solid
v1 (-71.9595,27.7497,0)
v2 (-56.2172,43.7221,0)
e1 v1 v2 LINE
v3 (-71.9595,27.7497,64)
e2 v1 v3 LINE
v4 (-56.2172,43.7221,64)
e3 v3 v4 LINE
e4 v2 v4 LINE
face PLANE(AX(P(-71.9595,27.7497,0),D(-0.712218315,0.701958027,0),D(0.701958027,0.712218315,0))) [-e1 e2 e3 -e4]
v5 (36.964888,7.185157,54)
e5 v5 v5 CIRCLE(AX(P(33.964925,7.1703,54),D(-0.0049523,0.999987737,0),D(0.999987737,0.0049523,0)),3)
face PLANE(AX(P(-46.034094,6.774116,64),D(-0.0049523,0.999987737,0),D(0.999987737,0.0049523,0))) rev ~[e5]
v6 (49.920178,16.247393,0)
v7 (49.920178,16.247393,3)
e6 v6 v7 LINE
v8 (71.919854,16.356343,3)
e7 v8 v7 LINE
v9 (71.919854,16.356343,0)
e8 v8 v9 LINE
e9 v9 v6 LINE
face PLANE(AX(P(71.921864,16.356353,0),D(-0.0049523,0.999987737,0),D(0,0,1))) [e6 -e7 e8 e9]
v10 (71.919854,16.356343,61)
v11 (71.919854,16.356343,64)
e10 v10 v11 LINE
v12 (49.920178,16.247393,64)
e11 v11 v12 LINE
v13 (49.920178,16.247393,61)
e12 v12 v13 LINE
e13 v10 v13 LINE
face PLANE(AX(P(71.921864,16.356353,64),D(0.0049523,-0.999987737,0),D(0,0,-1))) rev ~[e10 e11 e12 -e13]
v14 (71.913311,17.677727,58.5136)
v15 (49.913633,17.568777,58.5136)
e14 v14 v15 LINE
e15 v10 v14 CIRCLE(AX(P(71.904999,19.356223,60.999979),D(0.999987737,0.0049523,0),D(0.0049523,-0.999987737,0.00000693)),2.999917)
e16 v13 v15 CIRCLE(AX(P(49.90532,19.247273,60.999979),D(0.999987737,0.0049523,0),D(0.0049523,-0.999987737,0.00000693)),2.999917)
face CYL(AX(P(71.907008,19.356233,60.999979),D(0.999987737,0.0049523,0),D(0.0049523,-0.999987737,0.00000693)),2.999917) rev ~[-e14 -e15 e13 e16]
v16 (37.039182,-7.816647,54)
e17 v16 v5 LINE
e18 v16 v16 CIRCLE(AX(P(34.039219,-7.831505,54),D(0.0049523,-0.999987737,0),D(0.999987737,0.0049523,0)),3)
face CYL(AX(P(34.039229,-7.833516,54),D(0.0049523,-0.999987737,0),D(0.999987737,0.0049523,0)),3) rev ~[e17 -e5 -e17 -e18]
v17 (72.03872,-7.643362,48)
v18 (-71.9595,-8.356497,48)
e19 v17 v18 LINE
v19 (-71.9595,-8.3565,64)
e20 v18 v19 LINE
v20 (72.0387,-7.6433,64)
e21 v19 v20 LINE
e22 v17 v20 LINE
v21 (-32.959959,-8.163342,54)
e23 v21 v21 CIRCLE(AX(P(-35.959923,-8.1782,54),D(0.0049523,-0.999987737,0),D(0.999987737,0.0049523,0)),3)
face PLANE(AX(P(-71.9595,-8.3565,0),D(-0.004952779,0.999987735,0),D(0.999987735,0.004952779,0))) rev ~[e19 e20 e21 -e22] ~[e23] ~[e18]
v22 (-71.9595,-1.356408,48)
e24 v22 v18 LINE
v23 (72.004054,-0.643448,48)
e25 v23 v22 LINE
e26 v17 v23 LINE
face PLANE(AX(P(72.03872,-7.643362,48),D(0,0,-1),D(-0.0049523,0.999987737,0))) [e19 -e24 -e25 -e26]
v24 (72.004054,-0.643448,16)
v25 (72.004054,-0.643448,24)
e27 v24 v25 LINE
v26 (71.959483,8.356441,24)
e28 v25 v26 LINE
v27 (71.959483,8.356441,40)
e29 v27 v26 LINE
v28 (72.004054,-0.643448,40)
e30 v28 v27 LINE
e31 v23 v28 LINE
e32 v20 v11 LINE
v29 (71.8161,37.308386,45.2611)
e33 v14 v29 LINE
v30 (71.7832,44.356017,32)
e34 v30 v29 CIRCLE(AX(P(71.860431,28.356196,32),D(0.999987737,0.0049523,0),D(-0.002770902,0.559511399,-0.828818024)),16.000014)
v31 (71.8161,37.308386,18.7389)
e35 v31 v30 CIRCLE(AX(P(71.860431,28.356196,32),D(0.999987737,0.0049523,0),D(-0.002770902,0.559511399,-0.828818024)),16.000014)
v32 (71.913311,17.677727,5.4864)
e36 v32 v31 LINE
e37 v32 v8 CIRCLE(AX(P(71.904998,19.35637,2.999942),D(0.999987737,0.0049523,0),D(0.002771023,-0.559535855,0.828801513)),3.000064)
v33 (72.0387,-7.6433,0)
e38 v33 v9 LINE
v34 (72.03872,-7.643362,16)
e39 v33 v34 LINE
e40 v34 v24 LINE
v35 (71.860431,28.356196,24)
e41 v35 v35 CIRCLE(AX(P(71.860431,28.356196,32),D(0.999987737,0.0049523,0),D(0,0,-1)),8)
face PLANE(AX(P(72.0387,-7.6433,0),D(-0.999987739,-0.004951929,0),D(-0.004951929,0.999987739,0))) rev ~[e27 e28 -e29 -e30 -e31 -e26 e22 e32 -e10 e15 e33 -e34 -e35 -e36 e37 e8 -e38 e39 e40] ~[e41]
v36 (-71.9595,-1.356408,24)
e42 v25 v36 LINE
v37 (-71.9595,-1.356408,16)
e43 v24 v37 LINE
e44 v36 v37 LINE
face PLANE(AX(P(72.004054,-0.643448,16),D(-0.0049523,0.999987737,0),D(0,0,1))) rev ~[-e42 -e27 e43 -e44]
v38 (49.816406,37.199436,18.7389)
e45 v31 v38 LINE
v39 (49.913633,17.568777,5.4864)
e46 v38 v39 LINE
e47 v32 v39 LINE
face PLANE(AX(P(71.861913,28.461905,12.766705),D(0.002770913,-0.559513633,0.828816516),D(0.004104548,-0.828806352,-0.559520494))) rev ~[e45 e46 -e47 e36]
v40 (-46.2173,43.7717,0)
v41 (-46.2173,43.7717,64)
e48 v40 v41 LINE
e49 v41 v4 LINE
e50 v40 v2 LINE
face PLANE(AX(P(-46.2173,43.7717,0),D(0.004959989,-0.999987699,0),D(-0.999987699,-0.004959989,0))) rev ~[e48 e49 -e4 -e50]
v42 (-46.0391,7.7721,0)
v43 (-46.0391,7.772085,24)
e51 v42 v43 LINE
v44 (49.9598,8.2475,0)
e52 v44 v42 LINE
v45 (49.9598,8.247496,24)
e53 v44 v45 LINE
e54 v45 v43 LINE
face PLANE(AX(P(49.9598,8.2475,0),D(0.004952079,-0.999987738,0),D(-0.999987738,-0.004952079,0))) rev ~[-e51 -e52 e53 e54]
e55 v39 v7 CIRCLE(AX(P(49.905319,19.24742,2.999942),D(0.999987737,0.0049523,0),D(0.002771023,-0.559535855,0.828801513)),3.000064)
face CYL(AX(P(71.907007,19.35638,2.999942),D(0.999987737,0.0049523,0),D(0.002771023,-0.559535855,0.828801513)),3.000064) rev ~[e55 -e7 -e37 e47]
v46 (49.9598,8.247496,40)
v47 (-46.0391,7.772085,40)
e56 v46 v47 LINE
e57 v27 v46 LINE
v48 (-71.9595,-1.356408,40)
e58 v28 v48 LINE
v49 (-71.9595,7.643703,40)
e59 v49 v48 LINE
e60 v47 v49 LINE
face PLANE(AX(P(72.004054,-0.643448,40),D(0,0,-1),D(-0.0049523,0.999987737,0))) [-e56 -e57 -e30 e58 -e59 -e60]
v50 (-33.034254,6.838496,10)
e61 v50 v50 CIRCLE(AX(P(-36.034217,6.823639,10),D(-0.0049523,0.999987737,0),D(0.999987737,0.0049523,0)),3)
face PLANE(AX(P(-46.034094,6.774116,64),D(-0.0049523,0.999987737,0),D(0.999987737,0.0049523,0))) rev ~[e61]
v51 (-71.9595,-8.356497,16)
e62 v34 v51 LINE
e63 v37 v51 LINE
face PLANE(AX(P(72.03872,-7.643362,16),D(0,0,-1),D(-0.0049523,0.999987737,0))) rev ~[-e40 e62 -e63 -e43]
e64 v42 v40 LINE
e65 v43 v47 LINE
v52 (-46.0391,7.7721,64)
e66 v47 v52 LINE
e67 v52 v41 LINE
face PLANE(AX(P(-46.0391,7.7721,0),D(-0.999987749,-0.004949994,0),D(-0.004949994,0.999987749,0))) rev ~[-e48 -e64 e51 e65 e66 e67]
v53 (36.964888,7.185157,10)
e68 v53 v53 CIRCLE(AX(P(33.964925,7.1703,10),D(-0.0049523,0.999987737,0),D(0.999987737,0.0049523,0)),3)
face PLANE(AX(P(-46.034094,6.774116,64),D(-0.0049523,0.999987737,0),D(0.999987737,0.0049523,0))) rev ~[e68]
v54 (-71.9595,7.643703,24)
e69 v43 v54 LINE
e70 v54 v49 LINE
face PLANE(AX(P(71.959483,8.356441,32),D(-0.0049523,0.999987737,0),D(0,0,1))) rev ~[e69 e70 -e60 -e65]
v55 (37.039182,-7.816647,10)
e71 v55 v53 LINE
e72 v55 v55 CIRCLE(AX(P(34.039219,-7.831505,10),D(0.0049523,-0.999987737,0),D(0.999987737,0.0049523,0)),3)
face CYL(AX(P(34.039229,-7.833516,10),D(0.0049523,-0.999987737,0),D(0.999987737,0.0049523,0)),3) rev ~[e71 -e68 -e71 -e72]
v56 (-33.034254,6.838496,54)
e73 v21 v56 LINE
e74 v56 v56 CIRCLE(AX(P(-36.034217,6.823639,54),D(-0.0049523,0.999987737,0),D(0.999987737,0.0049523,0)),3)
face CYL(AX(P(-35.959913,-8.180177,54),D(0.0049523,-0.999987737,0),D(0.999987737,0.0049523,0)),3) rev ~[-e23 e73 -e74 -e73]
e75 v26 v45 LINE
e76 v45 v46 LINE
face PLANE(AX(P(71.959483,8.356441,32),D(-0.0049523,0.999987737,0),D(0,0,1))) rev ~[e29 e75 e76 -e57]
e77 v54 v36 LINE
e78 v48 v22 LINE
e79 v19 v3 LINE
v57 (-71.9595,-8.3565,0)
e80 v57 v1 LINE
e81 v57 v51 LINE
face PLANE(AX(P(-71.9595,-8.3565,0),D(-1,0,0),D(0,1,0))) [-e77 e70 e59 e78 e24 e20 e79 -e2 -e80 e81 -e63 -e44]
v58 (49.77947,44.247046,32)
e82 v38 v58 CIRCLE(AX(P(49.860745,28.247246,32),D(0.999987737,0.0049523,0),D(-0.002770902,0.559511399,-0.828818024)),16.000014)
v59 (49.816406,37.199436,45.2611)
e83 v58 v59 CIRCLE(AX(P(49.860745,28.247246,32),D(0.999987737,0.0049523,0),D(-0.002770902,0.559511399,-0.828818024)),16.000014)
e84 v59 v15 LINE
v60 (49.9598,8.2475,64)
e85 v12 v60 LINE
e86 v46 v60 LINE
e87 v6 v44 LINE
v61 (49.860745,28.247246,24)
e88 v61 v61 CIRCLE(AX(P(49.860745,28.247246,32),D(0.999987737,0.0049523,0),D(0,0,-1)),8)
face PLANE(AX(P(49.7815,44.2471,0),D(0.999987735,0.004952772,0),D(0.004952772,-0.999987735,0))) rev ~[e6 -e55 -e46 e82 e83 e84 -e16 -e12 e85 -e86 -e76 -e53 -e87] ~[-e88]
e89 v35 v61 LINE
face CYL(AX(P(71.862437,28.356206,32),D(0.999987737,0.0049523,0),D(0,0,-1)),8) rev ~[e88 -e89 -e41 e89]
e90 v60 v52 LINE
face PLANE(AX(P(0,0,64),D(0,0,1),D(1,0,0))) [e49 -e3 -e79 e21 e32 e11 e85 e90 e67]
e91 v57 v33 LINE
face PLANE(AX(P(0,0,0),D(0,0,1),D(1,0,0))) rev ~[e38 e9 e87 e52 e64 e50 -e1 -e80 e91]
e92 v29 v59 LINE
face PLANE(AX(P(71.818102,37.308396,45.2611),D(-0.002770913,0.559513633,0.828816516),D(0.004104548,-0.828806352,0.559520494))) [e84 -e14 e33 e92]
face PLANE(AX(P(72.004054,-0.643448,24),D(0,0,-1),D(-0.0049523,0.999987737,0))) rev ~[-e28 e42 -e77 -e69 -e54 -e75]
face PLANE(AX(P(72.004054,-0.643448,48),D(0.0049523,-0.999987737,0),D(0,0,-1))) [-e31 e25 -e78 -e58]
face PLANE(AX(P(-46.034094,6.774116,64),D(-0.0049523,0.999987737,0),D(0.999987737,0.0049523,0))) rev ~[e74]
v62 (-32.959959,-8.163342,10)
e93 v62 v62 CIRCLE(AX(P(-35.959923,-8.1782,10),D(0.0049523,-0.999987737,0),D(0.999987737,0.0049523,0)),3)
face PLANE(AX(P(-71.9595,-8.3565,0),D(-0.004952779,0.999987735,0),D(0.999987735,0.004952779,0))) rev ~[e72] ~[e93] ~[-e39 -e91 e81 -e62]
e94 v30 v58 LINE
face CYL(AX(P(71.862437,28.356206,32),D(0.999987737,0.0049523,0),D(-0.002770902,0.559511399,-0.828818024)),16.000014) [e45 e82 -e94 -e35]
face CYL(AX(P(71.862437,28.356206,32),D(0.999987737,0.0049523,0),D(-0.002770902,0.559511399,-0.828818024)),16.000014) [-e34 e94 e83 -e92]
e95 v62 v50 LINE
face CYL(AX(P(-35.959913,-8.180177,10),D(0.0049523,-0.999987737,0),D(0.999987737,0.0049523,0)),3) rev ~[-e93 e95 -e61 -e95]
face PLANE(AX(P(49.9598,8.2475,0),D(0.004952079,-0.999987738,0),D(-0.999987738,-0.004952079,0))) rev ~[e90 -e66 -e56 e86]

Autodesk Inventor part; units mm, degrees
ref_plane "YZ Plane" through (0, 0, 0) normal (1, 0, 0) x (0, 1, 0)
ref_plane "XZ Plane" through (0, 0, 0) normal (0, 1, 0) x (-1, 0, 0)
ref_plane "XY Plane" through (0, 0, 0) normal (0, 0, 1) x (1, 0, 0)
sketch "Sketch1" plane through (0, 0, 0) normal (0, 0, 1) x (1, 0, 0)
  line L0 (-71.9595, -8.3565) -> (72.0387, -7.6433)
  line L1 (72.0387, -7.6433) -> (71.7812, 44.356)
  line L2 (71.7812, 44.356) -> (49.7815, 44.2471)
  line L3 (49.7815, 44.2471) -> (49.9598, 8.2475)
  line L4 (49.9598, 8.2475) -> (-46.0391, 7.7721)
  line L5 (-46.0391, 7.7721) -> (-46.2173, 43.7717)
  line L6 (-46.2173, 43.7717) -> (-56.2172, 43.7221)
  line L7 (-71.9595, -8.3565) -> (-71.9595, 27.7497)
  line L8 (-71.9595, 27.7497) -> (-56.2172, 43.7221)
  point P0 (0, 0)
  dimension "d0" = 144
  dimension "d1" = 52
  dimension "d2" = 22
  dimension "d3" = 36
  dimension "d4" = 96
  dimension "d5" = 36
  dimension "d6" = 10
  dimension "d8" = 72
  dimension "d9" = 16
  dimension "d10" = 8
extrude "Extrusion1" add sketch "Sketch1" along normal blind 64
sketch "Sketch3" plane through (71.7812, 44.356, 64) normal (0.9999877, 0.0049523, 0) x (0, 0, -1)
  line L0 (64, -52) -> (64, 0) projected
  line L1 (0, -52) -> (0, 0) projected
  line L2 (48, -52) -> (48, -45)
  line L3 (40, -45) -> (40, -36)
  line L4 (48, -45) -> (40, -45)
  line L5 (40, -36) -> (32, -36)
  line L6 (64, -36) -> (0, -36) projected
  line L7 (16, -52) -> (16, -45)
  line L8 (24, -45) -> (24, -36)
  line L9 (16, -45) -> (24, -45)
  line L10 (24, -36) -> (32, -36)
  line L11 (16, -52) -> (48, -52)
  line L12 (64, -52) -> (0, -52) projected
  line L13 (64, -36) -> (64, 0) projected
  arc A0 (58.5136, -26.6786) -> (61, -28) centre (61, -25) ccw
  arc A1 (45.2611, -7.0477) -> (18.7389, -7.0477) centre (32, -16) ccw
  circle A2 centre (32, -16) radius 8
  line L14 (64, 0) -> (0, 0) projected
  line L15 (45.2611, -7.0477) -> (58.5136, -26.6786)
  line L16 (64, -28) -> (61, -28)
  line L17 (64, -15.8943) -> (0, -15.8943) projected
  arc A3 (3, -28) -> (5.4864, -26.6786) centre (3, -25) ccw
  line L18 (18.7389, -7.0477) -> (5.4864, -26.6786)
  line L19 (0, -28) -> (3, -28)
  line L20 (0, -36) -> (0, 0) projected
  line L21 (0, -28) -> (0, 0)
  line L22 (64, 0) -> (0, 0) projected
  line L23 (0, 0) -> (64, 0)
  line L24 (64, 0) -> (64, -28)
  point P0 (64, -44)
  point P1 (32, 0)
  point P2 (0, -28)
  point P3 (64, -28)
  dimension "d13" = 64
  dimension "d16" = 7
  dimension "d18" = 32
  dimension "d19" = 16
  dimension "d20" = 16
  dimension "d21" = 9
  dimension "d24" = 24
  dimension "d26" = 6
  dimension "d27" = 32
  dimension "d28" = 16
  dimension "d29" = 32
  dimension "d30" = 64
extrude "Extrusion2" cut sketch "Sketch3" against normal through all contours L11 L7 L9 L8 L6 L5 L3 L4 L2
extrude "Extrusion3" cut sketch "Sketch3" against normal blind 22 contours L16 A0 L15 L17 L0 | L17 L15 A1 L14 L0 | A1 L18 L17 L1 L14 | L17 A2 | A2 L17 | L1 L17 L18 A3 L19
sketch "Sketch4" plane through (-45.9598, -8.2277, 64) normal (-0.0049523, 0.9999877, 0) x (0.9999877, 0.0049523, 0)
  line L0 (118, 16) -> (118, 0) projected
  line L1 (96, 0) -> (0, 0) projected
  circle A0 centre (80, 10) radius 3
  circle A1 centre (10, 10) radius 3
  line L2 (-40.7838, 32) -> (143.3901, 32)
  circle A2 centre (80, 54) radius 3
  circle A3 centre (10, 54) radius 3
  point P0 (46, 64)
  dimension "d35" = 6
  dimension "d37" = 6
extrude "Extrusion4" cut sketch "Sketch4" along normal blind 15
equation "\"d8\" = 0.5 * d0"
equation "\"d10\" = 0.5 * d9"
equation "\"d29\" = 0.5 * d30"
properties part number "Parte2_Base" material "Steel, Carbon"
